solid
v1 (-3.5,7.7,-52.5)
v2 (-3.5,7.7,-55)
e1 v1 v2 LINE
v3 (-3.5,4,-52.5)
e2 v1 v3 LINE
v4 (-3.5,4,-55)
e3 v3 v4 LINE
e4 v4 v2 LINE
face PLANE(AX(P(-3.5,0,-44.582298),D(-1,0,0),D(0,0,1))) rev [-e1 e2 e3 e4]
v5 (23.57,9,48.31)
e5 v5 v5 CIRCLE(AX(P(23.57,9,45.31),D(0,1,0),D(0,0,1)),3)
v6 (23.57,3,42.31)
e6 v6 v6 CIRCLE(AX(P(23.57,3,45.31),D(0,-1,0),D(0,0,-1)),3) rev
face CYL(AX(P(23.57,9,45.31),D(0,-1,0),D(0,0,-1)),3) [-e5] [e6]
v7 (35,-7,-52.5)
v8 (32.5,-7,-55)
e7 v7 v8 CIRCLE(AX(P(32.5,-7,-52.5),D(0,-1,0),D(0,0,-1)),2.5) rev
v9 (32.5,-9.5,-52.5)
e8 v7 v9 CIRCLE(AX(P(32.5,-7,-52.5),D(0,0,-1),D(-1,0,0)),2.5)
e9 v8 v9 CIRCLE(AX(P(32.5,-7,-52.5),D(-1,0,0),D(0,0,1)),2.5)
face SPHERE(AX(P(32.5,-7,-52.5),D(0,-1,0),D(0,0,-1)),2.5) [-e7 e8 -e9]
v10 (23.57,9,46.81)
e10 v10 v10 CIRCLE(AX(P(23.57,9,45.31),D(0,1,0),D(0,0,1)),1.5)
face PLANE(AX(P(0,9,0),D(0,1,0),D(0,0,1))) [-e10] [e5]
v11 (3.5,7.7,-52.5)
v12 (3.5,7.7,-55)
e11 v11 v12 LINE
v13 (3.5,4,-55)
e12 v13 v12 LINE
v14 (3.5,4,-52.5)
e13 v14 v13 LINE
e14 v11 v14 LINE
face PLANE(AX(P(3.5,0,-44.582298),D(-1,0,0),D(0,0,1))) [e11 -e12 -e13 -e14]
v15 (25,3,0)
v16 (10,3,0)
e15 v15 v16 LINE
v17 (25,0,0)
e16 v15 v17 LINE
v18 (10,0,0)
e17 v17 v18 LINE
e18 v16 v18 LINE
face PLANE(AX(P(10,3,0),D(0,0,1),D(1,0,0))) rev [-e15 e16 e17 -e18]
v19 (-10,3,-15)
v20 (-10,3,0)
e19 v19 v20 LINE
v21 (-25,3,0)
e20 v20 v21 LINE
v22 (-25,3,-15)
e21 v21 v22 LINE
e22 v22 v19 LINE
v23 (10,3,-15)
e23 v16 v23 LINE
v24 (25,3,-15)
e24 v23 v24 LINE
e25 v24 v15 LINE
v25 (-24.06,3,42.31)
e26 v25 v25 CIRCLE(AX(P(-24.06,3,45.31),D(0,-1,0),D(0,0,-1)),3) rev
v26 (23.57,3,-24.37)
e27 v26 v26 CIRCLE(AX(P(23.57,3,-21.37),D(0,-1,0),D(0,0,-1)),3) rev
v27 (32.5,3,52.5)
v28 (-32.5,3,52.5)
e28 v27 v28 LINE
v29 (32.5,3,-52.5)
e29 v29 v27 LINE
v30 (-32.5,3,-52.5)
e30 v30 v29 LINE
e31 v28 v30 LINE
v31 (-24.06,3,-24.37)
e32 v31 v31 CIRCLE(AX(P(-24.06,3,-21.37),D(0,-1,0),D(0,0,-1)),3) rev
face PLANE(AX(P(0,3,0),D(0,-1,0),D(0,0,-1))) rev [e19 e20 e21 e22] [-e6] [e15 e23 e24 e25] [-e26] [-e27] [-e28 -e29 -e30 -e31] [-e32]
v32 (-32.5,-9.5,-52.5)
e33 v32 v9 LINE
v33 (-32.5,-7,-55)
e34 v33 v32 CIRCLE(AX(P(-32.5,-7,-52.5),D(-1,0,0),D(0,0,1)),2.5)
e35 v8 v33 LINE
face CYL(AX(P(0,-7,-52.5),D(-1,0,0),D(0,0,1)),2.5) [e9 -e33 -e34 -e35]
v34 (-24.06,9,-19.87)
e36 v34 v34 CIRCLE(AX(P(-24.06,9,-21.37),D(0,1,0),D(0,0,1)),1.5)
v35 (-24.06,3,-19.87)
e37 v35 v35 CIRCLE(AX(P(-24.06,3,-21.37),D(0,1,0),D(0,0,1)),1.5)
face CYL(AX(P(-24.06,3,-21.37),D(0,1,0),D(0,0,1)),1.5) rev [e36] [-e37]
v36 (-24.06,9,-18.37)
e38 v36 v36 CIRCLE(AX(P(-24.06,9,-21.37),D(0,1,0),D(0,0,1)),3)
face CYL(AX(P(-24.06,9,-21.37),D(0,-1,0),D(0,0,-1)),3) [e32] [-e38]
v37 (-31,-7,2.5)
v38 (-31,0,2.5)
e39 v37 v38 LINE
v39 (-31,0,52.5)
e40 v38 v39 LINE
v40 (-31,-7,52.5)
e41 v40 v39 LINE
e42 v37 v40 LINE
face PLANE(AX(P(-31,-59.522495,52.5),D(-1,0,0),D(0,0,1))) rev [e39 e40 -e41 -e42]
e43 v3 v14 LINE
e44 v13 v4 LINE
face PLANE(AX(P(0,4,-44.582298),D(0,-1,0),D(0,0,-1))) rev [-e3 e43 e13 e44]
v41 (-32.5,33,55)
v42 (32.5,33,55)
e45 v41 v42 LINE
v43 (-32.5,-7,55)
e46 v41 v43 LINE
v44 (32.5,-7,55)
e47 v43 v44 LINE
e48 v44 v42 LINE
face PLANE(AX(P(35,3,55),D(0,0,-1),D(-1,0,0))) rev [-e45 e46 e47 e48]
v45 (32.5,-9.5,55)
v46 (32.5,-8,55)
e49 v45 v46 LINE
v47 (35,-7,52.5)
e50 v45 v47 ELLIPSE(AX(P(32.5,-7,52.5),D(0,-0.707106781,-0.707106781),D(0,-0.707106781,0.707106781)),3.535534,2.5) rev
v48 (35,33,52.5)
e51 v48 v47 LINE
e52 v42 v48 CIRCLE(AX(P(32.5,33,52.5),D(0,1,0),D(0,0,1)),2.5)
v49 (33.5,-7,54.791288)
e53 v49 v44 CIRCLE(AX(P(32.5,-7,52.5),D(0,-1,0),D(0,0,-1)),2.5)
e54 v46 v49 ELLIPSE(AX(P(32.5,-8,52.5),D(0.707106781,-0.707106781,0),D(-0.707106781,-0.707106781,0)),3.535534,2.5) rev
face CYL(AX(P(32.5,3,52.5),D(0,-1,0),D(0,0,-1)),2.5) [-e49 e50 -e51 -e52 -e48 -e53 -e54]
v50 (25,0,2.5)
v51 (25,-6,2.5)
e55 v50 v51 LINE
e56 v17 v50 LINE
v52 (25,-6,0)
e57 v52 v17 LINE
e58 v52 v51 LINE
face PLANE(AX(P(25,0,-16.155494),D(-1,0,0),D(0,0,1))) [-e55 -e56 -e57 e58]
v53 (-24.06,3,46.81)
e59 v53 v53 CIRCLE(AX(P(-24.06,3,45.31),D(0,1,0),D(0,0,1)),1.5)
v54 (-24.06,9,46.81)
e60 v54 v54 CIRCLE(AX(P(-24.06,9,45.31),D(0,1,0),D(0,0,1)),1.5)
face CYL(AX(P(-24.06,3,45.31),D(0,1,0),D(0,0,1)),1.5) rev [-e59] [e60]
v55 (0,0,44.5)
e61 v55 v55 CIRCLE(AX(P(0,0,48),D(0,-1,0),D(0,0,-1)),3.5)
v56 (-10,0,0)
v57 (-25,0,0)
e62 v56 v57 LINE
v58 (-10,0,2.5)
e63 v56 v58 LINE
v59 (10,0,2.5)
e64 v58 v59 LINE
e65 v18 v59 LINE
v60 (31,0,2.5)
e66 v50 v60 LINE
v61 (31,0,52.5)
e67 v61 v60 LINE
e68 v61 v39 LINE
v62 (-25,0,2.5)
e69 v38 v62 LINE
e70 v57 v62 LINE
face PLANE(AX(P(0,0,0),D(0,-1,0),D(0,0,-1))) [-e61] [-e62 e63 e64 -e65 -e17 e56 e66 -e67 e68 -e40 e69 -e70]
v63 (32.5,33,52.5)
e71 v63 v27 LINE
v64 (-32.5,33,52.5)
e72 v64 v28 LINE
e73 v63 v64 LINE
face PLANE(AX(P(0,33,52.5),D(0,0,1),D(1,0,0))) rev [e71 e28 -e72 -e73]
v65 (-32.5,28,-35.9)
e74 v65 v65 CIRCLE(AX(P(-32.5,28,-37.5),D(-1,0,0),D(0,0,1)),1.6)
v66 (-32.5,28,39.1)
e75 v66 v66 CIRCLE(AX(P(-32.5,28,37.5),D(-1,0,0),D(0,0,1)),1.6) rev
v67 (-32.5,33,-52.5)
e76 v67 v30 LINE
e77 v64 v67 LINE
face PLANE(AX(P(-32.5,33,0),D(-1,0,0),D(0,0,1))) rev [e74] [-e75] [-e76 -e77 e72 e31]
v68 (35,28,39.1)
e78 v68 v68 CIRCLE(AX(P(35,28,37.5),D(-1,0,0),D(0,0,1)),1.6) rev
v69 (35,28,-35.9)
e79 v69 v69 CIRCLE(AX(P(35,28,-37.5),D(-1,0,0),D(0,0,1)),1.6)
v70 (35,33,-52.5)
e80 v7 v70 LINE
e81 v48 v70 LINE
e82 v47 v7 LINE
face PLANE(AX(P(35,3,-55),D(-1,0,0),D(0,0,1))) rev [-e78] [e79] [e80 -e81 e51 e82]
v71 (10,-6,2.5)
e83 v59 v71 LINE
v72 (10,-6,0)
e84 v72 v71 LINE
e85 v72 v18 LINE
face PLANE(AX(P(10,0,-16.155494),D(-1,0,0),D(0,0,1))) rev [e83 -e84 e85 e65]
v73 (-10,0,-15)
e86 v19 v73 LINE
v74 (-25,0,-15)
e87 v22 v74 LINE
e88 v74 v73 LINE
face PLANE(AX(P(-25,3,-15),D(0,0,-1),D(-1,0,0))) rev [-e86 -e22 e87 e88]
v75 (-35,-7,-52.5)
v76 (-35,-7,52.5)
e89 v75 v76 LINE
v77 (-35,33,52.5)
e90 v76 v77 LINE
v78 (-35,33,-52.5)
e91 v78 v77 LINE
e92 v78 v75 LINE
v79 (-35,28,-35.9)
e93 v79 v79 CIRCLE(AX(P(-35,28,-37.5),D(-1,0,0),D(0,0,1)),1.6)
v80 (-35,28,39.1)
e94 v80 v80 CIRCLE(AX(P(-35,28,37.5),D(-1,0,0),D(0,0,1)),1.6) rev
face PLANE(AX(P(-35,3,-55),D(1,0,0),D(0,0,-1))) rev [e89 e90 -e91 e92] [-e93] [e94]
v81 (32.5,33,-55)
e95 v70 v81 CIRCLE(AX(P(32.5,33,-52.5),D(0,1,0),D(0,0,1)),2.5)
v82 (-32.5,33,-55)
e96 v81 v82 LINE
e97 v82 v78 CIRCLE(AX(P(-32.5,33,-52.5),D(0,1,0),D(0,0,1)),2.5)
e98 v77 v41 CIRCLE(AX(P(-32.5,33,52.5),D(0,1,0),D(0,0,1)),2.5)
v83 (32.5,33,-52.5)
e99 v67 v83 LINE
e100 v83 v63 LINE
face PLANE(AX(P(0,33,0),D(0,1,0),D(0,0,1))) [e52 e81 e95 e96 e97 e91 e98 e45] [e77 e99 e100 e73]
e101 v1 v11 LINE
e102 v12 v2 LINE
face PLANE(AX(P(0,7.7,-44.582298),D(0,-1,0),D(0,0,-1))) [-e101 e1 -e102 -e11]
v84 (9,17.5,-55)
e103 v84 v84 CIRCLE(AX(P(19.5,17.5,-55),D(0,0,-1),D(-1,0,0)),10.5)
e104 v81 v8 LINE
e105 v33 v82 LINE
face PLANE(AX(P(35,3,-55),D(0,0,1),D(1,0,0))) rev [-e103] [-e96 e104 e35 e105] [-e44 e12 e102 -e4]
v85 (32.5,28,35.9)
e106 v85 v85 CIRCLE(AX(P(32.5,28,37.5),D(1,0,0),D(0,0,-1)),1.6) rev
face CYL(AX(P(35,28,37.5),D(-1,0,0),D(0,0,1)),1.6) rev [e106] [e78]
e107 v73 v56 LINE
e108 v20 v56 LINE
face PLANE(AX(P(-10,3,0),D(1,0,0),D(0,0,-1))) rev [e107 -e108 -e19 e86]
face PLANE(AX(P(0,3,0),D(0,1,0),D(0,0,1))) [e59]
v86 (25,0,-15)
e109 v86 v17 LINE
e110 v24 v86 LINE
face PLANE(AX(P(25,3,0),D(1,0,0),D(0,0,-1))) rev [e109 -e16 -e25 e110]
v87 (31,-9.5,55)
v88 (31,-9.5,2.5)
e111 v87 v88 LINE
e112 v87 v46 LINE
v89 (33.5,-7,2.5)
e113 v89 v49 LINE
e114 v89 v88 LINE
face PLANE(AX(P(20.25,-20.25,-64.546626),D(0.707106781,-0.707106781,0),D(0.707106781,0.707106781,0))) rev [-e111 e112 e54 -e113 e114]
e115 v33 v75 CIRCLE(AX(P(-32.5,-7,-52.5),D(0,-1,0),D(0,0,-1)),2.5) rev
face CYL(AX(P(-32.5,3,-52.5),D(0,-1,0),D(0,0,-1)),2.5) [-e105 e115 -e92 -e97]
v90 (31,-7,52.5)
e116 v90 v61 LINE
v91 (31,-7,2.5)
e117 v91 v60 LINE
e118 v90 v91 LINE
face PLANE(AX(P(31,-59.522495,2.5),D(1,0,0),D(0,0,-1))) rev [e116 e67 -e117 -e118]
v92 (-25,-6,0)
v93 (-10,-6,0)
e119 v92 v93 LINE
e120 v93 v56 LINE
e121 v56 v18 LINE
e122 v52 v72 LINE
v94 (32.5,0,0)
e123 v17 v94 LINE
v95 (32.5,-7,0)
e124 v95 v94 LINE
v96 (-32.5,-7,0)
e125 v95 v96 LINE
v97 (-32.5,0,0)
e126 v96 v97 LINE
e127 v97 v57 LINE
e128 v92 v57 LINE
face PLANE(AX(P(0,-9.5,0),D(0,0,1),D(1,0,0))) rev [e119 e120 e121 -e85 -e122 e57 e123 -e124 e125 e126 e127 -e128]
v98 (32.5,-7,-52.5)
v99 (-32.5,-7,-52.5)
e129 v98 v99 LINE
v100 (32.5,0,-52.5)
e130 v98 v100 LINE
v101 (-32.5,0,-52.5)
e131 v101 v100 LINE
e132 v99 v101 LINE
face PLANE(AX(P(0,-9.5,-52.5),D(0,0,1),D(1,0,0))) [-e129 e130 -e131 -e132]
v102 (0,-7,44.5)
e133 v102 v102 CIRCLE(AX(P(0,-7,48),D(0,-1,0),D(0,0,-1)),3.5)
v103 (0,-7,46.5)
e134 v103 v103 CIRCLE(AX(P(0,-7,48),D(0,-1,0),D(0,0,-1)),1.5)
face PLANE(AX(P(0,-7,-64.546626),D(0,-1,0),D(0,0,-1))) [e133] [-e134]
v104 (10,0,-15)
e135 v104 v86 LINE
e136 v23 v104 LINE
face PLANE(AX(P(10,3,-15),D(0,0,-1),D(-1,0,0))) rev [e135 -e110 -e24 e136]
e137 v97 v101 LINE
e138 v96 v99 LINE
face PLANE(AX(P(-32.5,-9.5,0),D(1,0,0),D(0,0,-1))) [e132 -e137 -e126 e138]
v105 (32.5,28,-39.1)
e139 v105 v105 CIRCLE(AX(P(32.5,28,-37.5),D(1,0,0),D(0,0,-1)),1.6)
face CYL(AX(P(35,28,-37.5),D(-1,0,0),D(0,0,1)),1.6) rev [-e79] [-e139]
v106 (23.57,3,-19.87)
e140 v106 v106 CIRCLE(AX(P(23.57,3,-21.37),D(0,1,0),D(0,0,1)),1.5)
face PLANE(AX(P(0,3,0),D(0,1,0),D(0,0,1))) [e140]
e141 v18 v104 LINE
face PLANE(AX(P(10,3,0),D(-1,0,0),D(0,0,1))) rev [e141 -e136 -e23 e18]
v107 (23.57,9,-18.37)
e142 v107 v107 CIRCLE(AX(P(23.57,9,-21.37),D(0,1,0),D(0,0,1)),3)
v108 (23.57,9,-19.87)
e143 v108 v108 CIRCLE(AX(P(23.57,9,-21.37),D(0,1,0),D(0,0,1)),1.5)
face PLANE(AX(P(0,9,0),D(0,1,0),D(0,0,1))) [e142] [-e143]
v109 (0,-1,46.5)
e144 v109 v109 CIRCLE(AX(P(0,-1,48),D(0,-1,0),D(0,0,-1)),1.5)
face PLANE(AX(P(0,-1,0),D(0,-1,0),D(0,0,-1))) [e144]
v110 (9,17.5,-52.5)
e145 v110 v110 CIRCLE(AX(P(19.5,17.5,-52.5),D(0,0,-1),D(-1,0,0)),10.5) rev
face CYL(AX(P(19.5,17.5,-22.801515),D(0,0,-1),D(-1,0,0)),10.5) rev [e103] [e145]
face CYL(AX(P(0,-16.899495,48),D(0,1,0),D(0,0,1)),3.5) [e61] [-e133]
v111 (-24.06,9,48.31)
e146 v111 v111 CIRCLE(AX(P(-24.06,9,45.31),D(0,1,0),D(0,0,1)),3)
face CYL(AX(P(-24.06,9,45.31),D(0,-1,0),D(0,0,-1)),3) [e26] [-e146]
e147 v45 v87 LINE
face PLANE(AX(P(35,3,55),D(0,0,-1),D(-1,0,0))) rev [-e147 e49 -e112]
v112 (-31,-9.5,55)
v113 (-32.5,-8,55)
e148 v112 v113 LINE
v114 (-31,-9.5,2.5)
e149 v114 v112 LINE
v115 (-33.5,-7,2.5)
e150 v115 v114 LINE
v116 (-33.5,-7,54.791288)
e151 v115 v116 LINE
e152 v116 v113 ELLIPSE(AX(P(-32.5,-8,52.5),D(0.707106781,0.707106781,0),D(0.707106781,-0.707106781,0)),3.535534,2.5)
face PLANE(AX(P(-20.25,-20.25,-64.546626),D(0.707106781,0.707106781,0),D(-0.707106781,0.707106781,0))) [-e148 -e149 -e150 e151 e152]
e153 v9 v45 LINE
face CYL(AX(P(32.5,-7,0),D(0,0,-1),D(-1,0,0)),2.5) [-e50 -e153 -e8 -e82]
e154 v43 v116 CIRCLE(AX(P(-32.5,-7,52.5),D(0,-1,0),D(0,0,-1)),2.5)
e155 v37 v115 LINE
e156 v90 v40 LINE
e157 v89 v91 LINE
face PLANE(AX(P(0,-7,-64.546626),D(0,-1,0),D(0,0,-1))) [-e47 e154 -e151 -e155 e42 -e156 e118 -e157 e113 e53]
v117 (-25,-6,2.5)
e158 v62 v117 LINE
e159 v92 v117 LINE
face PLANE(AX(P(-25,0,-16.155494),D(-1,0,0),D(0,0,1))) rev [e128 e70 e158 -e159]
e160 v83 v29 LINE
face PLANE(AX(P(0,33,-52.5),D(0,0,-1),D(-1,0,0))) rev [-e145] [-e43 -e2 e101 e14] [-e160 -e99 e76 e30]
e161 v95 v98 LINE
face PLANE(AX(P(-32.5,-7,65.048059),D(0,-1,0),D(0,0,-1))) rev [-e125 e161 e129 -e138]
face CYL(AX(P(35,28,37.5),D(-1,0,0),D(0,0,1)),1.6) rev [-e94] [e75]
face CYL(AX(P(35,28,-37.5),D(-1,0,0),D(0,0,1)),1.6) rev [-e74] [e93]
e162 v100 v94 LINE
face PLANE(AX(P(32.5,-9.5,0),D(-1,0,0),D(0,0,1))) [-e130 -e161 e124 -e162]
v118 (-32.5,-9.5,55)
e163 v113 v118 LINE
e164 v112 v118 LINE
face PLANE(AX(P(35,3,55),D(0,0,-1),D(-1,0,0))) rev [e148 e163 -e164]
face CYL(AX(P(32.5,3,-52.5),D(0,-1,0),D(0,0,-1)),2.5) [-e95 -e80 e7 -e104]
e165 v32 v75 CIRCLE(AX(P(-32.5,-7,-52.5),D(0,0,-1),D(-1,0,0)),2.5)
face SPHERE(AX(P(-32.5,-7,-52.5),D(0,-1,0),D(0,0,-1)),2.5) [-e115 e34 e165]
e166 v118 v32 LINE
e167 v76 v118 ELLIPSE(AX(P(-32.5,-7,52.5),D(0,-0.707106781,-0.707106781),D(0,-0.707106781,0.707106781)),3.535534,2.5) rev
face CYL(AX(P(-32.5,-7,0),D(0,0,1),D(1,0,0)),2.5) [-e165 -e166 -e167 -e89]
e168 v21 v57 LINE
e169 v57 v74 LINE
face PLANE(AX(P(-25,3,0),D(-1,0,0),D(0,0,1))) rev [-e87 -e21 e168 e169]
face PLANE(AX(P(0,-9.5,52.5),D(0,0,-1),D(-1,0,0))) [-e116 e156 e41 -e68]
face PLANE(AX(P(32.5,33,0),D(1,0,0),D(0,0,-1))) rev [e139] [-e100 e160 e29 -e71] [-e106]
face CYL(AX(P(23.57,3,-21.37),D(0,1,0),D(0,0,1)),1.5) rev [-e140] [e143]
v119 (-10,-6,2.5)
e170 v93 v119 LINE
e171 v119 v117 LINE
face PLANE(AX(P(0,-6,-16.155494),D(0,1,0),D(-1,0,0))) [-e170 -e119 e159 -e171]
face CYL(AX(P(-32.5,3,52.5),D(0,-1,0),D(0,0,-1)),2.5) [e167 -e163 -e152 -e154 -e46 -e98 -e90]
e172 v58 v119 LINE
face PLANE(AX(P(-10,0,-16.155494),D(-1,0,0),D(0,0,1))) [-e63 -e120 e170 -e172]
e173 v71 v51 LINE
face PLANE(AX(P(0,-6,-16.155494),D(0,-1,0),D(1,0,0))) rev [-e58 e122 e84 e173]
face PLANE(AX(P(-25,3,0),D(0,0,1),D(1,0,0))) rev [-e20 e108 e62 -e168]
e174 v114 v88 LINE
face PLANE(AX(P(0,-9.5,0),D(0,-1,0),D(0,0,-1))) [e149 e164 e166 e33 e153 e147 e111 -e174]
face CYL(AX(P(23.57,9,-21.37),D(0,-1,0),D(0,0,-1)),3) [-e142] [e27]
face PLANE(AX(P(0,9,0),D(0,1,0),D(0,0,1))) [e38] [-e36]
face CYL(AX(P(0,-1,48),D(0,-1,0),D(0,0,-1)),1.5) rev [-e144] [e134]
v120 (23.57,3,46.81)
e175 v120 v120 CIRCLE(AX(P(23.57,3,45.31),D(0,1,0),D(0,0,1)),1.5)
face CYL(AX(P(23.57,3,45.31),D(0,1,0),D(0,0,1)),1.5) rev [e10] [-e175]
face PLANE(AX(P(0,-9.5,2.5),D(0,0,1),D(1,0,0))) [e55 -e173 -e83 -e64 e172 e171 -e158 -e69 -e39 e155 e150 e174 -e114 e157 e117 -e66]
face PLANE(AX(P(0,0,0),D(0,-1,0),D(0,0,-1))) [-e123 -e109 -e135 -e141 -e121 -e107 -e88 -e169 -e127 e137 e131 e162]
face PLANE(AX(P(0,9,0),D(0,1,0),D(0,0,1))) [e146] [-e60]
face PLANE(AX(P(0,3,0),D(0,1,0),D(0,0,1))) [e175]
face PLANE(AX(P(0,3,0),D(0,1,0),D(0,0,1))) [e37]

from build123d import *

# Parameters (mm, degrees)
SKETCH3_W           = 70
SKETCH3_H           = 110
BOSS_EXTRUDE1_DEPTH = 3
SKETCH4_W           = 2.5
SKETCH4_H           = 105
BOSS_EXTRUDE2_DEPTH = 30
SKETCH5_R           = 3
BOSS_EXTRUDE3_DEPTH = 6
SKETCH7_W           = 70
SKETCH7_H           = 110
SKETCH7_W_2         = 65
SKETCH7_H_2         = 52.5
SKETCH7_H_3         = 50
BOSS_EXTRUDE4_DEPTH = 9.5
SKETCH8_W           = 15
SKETCH8_H           = 6
CUT_EXTRUDE2_DEPTH  = 2.5
SKETCH9_W           = 15
SKETCH9_H           = 15
CUT_EXTRUDE3_DEPTH  = 3
SKETCH10_W          = 1.5
SKETCH10_H          = 50
BOSS_EXTRUDE5_DEPTH = 9.5
SKETCH11_W          = 31
SKETCH11_H          = 2.5
CUT_EXTRUDE5_DEPTH  = 52.5
SKETCH12_R          = 3.5
BOSS_EXTRUDE6_DEPTH = 7
SKETCH15_R          = 1.5
CUT_EXTRUDE6_DEPTH  = 6
SKETCH16_W          = 65
SKETCH16_H          = 2.5
BOSS_EXTRUDE7_DEPTH = 52.5
SKETCH17_R          = 1.6
CUT_EXTRUDE7_DEPTH  = 95.942087611
SKETCH18_W          = 7
SKETCH18_H          = 3.7
CUT_EXTRUDE8_DEPTH  = 2.5
SKETCH19_R          = 1.5
CUT_EXTRUDE9_DEPTH  = 6
SKETCH20_R          = 10.5
CUT_EXTRUDE10_DEPTH = 2.5
FILLET2_R           = 2.5
FILLET3_R           = 2.5


with BuildPart() as part:
    # Sketch3 → Boss-Extrude1 (new body)
    with BuildSketch(Plane(origin=(0, 0, 0), x_dir=(1, 0, 0), z_dir=(0, 1, 0))):
        Rectangle(SKETCH3_W, SKETCH3_H)
    extrude(amount=BOSS_EXTRUDE1_DEPTH)

    # Sketch4 → Boss-Extrude2 (add)
    with BuildSketch(Plane(origin=(0, 3, 0), x_dir=(1, 0, 0), z_dir=(0, 1, 0))):
        with Locations((-33.75, 0)):
            Rectangle(SKETCH4_W, SKETCH4_H)
        Polygon((35, 55), (-35, 55), (-35, 52.5), (-32.5, 52.5), (32.5, 52.5), (35, 52.5), align=None)
        Polygon((35, -55), (35, 52.5), (32.5, 52.5), (32.5, -52.5), (32.5, -55), align=None)
        Polygon((-32.5, -52.5), (-35, -52.5), (-35, -55), (32.5, -55), (32.5, -52.5), align=None)
    extrude(amount=BOSS_EXTRUDE2_DEPTH)

    # Sketch5 → Boss-Extrude3 (add)
    with BuildSketch(Plane(origin=(0, 3, 0), x_dir=(1, 0, 0), z_dir=(0, 1, 0))):
        with Locations(Location((-24.06, 21.37, 0), (0, 0, 90))):
            Circle(SKETCH5_R)
        with Locations(Location((23.57, 21.37, 0), (0, 0, 90))):
            Circle(SKETCH5_R)
        with Locations(Location((23.57, -45.31, 0), (0, 0, 90))):
            Circle(SKETCH5_R)
        with Locations(Location((-24.06, -45.31, 0), (0, 0, 90))):
            Circle(SKETCH5_R)
    extrude(amount=BOSS_EXTRUDE3_DEPTH)

    # Sketch7 → Boss-Extrude4 (add)
    with BuildSketch(Plane.XZ):
        Rectangle(SKETCH7_W, SKETCH7_H)
        with Locations((0, -26.25)):
            Rectangle(SKETCH7_W_2, SKETCH7_H_2, mode=Mode.SUBTRACT)
        with Locations((0, 27.5)):
            Rectangle(SKETCH7_W_2, SKETCH7_H_3, mode=Mode.SUBTRACT)
    extrude(amount=BOSS_EXTRUDE4_DEPTH)

    # Sketch8 → Cut-Extrude2 (cut)
    with BuildSketch(Plane.XY.offset(2.5)):
        with Locations((17.5, -3)):
            Rectangle(SKETCH8_W, SKETCH8_H)
        with Locations((-17.5, -3)):
            Rectangle(SKETCH8_W, SKETCH8_H)
    extrude(amount=-CUT_EXTRUDE2_DEPTH, mode=Mode.SUBTRACT)

    # Sketch9 → Cut-Extrude3 (cut)
    with BuildSketch(Plane.XZ):
        with Locations((-17.5, -7.5)):
            Rectangle(SKETCH9_W, SKETCH9_H)
        with Locations((17.5, -7.5)):
            Rectangle(SKETCH9_W, SKETCH9_H)
    extrude(amount=-CUT_EXTRUDE3_DEPTH, mode=Mode.SUBTRACT)

    # Sketch10 → Boss-Extrude5 (add)
    with BuildSketch(Plane.XZ):
        with Locations((-31.75, 27.5)):
            Rectangle(SKETCH10_W, SKETCH10_H)
        with Locations((31.75, 27.5)):
            Rectangle(SKETCH10_W, SKETCH10_H)
    extrude(amount=BOSS_EXTRUDE5_DEPTH)

    # Sketch11 → Cut-Extrude5 (cut)
    with BuildSketch(Plane.XY.offset(55)):
        with Locations((-15.5, -8.25)):
            Rectangle(SKETCH11_W, SKETCH11_H)
        Polygon((-33.5, -7), (-31, -9.5), (-31, -7), align=None)
        with Locations((15.5, -8.25)):
            Rectangle(SKETCH11_W, SKETCH11_H)
        Polygon((31, -7), (31, -9.5), (33.5, -7), align=None)
    extrude(amount=-CUT_EXTRUDE5_DEPTH, mode=Mode.SUBTRACT)

    # Sketch12 → Boss-Extrude6 (add)
    with BuildSketch(Plane.XZ):
        with Locations(Location((0, 48, 0), (0, 0, 270))):
            Circle(SKETCH12_R)
    extrude(amount=BOSS_EXTRUDE6_DEPTH)

    # Sketch15 → Cut-Extrude6 (cut)
    with BuildSketch(Plane.XZ.offset(7)):
        with Locations(Location((0, 48, 0), (0, 0, 270))):
            Circle(SKETCH15_R)
    extrude(amount=-CUT_EXTRUDE6_DEPTH, mode=Mode.SUBTRACT)

    # Sketch16 → Boss-Extrude7 (add)
    with BuildSketch(Plane.XY.offset(-52.5)):
        with Locations((0, -8.25)):
            Rectangle(SKETCH16_W, SKETCH16_H)
    extrude(amount=BOSS_EXTRUDE7_DEPTH)

    # Sketch17 → Cut-Extrude7 (cut, through all)
    with BuildSketch(Plane.ZY.offset(35)):
        with Locations((-37.5, 28)):
            Circle(SKETCH17_R)
        with Locations((37.5, 28)):
            Circle(SKETCH17_R)
    extrude(amount=-CUT_EXTRUDE7_DEPTH, mode=Mode.SUBTRACT)

    # Sketch18 → Cut-Extrude8 (cut)
    with BuildSketch(Plane(origin=(0, 0, -55), x_dir=(-1, 0, 0), z_dir=(0, 0, -1))):
        with Locations((0, 5.85)):
            Rectangle(SKETCH18_W, SKETCH18_H)
    extrude(amount=-CUT_EXTRUDE8_DEPTH, mode=Mode.SUBTRACT)

    # Sketch19 → Cut-Extrude9 (cut)
    with BuildSketch(Plane(origin=(0, 9, 0), x_dir=(1, 0, 0), z_dir=(0, 1, 0))):
        with Locations(Location((-24.06, -45.31, 0), (0, 0, 270))):
            Circle(SKETCH19_R)
        with Locations(Location((-24.06, 21.37, 0), (0, 0, 270))):
            Circle(SKETCH19_R)
        with Locations(Location((23.57, 21.37, 0), (0, 0, 270))):
            Circle(SKETCH19_R)
        with Locations(Location((23.57, -45.31, 0), (0, 0, 270))):
            Circle(SKETCH19_R)
    extrude(amount=-CUT_EXTRUDE9_DEPTH, mode=Mode.SUBTRACT)

    # Sketch20 → Cut-Extrude10 (cut)
    with BuildSketch(Plane(origin=(0, 0, -55), x_dir=(-1, 0, 0), z_dir=(0, 0, -1))):
        with Locations((-19.5, 17.5)):
            Circle(SKETCH20_R)
    extrude(amount=-CUT_EXTRUDE10_DEPTH, mode=Mode.SUBTRACT)

    # Fillet2
    # the kernel refuses this fillet: 2.5 mm, written as the material it takes off along each edge
    with BuildSketch(Plane(origin=(-35, -15.75, -55), x_dir=(1, 0, 0), z_dir=(0, 1, 0)), Plane(origin=(35, 39.25, -55), x_dir=(-1, 0, 0), z_dir=(0, -1, 0)), Plane(origin=(35, 39.25, 55), x_dir=(0, 0, -1), z_dir=(0, -1, 0)), Plane(origin=(-35, -15.75, 55), x_dir=(0, 0, -1), z_dir=(0, 1, 0))) as fillet2_piece_1:
        with BuildLine():
            CenterArc((FILLET2_R, -FILLET2_R), FILLET2_R, 90, 90)
            Line((0, -FILLET2_R), (0, 0))
            Line((0, 0), (FILLET2_R, 0))
        make_face()
    extrude(amount=55, mode=Mode.SUBTRACT)

    # Fillet3
    # the kernel refuses this fillet: 2.5 mm, written as the material it takes off along each edge
    with BuildSketch(Plane(origin=(-32.5, -9.5, -52.5), x_dir=(-1, 0, 0), z_dir=(0, 0, 1))) as fillet3_piece_1:
        with BuildLine():
            CenterArc((2.5 - FILLET3_R, -FILLET3_R), FILLET3_R, 0, 90)
            Line((2.5, -FILLET3_R), (2.5, 0))
            Line((2.5, 0), (2.5 - FILLET3_R, 0))
        make_face()
    revolve(axis=Axis((-32.5, -9.5, -52.5), (0, -1, 0)), revolution_arc=90, mode=Mode.SUBTRACT)
    with BuildSketch(Plane(origin=(32.5, -9.5, -52.5), x_dir=(1, 0, 0), z_dir=(0, 0, 1))) as fillet3_piece_2:
        with BuildLine():
            CenterArc((2.5 - FILLET3_R, FILLET3_R), FILLET3_R, 270, 90)
            Line((2.5 - FILLET3_R, 0), (2.5, 0))
            Line((2.5, 0), (2.5, FILLET3_R))
        make_face()
    revolve(axis=Axis((32.5, -9.5, -52.5), (0, 1, 0)), revolution_arc=90, mode=Mode.SUBTRACT)
    with BuildSketch(Plane(origin=(35, -9.5, -52.5), x_dir=(-1, 0, 0), z_dir=(0, 0, 1)), Plane(origin=(-35, -9.5, 58.75), x_dir=(1, 0, 0), z_dir=(0, 0, -1))) as fillet3_piece_3:
        with BuildLine():
            CenterArc((FILLET3_R, -FILLET3_R), FILLET3_R, 90, 90)
            Line((0, -FILLET3_R), (0, 0))
            Line((0, 0), (FILLET3_R, 0))
        make_face()
    extrude(amount=111.25, mode=Mode.SUBTRACT)
    with BuildSketch(Plane(origin=(-32.5, -9.5, -55), x_dir=(0, 1, 0), z_dir=(1, 0, 0))) as fillet3_piece_4:
        with BuildLine():
            CenterArc((FILLET3_R, FILLET3_R), FILLET3_R, 180, 90)
            Line((0, FILLET3_R), (0, 0))
            Line((0, 0), (FILLET3_R, 0))
        make_face()
    extrude(amount=65, mode=Mode.SUBTRACT)


solid = part.part
